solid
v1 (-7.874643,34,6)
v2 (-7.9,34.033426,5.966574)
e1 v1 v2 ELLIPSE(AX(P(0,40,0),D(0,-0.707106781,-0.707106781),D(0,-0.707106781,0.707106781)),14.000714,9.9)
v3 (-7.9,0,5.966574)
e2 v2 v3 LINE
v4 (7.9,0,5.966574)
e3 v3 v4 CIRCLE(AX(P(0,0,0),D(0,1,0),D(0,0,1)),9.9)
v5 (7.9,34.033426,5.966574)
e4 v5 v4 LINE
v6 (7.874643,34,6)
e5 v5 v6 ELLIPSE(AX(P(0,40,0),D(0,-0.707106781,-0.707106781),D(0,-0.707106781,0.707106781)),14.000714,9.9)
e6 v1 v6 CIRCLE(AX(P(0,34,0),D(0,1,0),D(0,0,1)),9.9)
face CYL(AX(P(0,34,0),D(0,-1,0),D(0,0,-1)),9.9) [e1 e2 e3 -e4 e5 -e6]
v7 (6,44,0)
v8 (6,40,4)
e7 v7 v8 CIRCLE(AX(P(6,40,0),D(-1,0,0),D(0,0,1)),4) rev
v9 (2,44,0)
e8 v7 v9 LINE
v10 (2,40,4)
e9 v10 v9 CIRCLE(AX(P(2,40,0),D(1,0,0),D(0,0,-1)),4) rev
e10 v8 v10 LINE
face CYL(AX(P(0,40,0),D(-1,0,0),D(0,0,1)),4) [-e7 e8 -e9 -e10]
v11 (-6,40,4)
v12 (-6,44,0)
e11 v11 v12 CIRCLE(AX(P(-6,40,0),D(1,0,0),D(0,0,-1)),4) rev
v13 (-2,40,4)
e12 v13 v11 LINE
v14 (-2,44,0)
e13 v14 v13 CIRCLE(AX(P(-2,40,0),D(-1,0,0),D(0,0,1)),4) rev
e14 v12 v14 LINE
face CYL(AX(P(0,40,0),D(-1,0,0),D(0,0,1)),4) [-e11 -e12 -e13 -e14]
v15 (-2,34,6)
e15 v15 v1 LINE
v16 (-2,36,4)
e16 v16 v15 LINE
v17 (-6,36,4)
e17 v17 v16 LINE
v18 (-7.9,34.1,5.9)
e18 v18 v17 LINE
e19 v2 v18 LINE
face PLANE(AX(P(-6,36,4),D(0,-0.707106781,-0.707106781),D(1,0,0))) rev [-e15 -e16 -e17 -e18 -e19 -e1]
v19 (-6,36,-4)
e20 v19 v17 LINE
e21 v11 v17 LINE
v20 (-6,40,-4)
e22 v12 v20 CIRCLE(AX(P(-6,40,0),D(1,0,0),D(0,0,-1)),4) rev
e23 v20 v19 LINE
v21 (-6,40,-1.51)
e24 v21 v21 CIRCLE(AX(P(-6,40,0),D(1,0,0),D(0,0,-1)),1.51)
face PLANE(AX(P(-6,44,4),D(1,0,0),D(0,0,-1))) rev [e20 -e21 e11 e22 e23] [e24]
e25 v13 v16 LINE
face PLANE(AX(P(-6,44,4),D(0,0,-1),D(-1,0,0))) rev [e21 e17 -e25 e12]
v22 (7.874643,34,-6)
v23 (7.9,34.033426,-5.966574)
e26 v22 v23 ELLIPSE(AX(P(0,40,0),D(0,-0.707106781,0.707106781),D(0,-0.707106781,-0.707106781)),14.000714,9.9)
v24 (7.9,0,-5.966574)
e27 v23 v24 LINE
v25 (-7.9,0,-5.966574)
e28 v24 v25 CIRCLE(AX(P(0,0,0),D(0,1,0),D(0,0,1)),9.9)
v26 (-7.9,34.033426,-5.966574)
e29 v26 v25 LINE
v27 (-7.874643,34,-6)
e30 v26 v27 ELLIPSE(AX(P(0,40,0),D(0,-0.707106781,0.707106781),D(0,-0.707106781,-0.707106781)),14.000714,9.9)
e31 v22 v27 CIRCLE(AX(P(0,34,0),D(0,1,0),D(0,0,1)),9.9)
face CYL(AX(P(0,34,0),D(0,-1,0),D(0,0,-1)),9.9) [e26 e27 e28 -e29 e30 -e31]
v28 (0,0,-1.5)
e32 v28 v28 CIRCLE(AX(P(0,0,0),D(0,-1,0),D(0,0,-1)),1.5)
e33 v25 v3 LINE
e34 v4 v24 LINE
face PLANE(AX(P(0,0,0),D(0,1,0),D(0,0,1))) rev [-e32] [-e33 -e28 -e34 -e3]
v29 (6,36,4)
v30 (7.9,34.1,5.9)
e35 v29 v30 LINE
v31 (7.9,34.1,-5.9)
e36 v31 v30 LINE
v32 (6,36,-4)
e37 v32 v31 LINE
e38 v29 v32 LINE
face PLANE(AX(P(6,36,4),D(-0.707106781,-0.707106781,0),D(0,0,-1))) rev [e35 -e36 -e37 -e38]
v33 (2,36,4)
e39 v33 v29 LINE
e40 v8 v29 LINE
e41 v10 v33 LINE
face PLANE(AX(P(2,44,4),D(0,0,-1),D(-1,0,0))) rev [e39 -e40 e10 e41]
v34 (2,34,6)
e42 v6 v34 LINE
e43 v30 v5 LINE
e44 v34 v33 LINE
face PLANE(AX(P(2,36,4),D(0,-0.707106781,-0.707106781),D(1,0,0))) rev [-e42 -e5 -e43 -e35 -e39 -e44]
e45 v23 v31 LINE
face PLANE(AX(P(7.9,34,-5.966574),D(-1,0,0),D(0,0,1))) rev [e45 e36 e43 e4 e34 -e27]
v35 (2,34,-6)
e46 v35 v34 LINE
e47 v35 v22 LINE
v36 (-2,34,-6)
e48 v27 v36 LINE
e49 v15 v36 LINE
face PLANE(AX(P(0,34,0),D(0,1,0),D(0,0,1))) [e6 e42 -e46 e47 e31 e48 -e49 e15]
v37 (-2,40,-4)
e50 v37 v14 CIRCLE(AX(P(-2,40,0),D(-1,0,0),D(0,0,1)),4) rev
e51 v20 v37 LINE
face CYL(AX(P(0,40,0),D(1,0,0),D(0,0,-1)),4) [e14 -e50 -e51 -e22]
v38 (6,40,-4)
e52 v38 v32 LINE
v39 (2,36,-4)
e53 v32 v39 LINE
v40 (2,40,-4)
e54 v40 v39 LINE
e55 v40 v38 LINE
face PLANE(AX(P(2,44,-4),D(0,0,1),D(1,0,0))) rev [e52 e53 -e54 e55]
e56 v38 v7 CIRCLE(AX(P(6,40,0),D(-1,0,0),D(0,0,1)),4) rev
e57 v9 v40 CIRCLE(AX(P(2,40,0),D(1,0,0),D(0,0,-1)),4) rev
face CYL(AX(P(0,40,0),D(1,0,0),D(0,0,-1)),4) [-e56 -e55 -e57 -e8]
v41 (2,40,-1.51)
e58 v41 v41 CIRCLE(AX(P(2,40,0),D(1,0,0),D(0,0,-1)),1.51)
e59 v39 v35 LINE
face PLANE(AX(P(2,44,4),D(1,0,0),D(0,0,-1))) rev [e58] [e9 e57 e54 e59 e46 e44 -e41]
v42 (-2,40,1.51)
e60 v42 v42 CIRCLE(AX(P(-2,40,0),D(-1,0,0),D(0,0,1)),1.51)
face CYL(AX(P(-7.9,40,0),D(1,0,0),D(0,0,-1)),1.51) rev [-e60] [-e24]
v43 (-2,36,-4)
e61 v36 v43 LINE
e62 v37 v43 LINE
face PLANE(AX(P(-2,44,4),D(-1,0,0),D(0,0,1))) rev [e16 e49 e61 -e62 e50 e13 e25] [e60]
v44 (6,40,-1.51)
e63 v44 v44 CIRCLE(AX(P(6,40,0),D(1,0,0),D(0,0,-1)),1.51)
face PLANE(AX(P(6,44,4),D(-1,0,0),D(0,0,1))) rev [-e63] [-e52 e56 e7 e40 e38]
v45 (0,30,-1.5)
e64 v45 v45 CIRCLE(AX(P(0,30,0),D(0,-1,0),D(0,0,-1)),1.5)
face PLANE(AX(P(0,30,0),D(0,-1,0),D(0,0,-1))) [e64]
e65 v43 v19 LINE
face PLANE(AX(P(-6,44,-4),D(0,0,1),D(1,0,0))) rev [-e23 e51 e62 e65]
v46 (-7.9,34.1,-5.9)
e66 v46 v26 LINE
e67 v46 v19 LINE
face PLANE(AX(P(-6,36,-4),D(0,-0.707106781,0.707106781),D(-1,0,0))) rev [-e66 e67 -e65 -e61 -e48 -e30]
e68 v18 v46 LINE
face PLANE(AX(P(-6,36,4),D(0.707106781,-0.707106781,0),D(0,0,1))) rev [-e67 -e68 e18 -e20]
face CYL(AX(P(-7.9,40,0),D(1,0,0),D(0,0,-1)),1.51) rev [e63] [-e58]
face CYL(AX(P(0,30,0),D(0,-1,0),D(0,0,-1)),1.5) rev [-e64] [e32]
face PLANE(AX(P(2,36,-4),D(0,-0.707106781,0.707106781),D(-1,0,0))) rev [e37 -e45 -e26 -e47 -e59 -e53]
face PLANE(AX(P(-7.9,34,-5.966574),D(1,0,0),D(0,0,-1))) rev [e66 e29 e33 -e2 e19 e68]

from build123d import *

# Parameters (mm, degrees)
BOSS_EXTRUDE1_DEPTH = 34
SKETCH7_W           = 4
SKETCH7_H           = 8
BOSS_EXTRUDE3_DEPTH = 10
SKETCH9_R           = 1.51
CUT_EXTRUDE5_DEPTH  = 48.193431746
FILLET2_R           = 4
SKETCH16_R          = 1.5
CUT_EXTRUDE7_DEPTH  = 30
CHAMFER1_SIZE       = 2


# Some blends are built 0.0001 mm under size
with BuildPart() as part:
    # Sketch1 → Boss-Extrude1 (new body)
    with BuildSketch(Plane(origin=(0, 0, 0), x_dir=(1, 0, 0), z_dir=(0, 1, 0))):
        with BuildLine():
            Line((-7.9, 5.966573556), (-7.9, -5.966573556))
            ThreePointArc((-7.9, -5.966573556), (0, -9.9), (7.9, -5.966573556))
            Line((7.9, -5.966573556), (7.9, 5.966573556))
            ThreePointArc((7.9, 5.966573556), (0, 9.9), (-7.9, 5.966573556))
        make_face()
    extrude(amount=BOSS_EXTRUDE1_DEPTH)

    # Sketch7 → Boss-Extrude3 (add)
    with BuildSketch(Plane(origin=(0, 34, 0), x_dir=(1, 0, 0), z_dir=(0, 1, 0))):
        with Locations((-4, 0)):
            Rectangle(SKETCH7_W, SKETCH7_H)
        with Locations((4, 0)):
            Rectangle(SKETCH7_W, SKETCH7_H)
    extrude(amount=BOSS_EXTRUDE3_DEPTH)

    # Sketch9 → Cut-Extrude5 (cut, through all)
    with BuildSketch(Plane(origin=(6, 0, 0), x_dir=(0, 0, -1), z_dir=(1, 0, 0))):
        with Locations((0, 40)):
            Circle(SKETCH9_R)
    extrude(amount=-CUT_EXTRUDE5_DEPTH, mode=Mode.SUBTRACT)

    # Fillet2
    fillet2_edges = [part.edges().sort_by_distance(p)[0] for p in [
        (4, 44, 4),
        (4, 44, -4),
        (-4, 44, -4),
        (-4, 44, 4),
    ]]
    fillet(fillet2_edges, radius=FILLET2_R - 0.0001)  # a hair under: the kernel refuses the full size

    # Sketch16 → Cut-Extrude7 (cut)
    with BuildSketch(Plane.XZ):
        with Locations(Location((0, 0, 0), (0, 0, 270))):
            Circle(SKETCH16_R)
    extrude(amount=-CUT_EXTRUDE7_DEPTH, mode=Mode.SUBTRACT)

    # Chamfer1
    # the kernel refuses this chamfer: 2 mm, written as the material it adds along each edge
    with BuildSketch(Plane(origin=(-6, 34, -4), x_dir=(0, -0.027495876610585623, -0.9996219169112968), z_dir=(1, 0, 0)), Plane(origin=(2, 34, -4), x_dir=(0, -0.027495876610585623, -0.9996219169112968), z_dir=(1, 0, 0)), Plane(origin=(6, 34, 4), x_dir=(0, -0.027495876610585623, 0.9996219169112968), z_dir=(-1, 0, 0))) as chamfer1_piece_1:
        Polygon((CHAMFER1_SIZE * 0.999621916911, CHAMFER1_SIZE * 0.0274958766106), (-CHAMFER1_SIZE * 0.0274958766106, CHAMFER1_SIZE * 0.999621916911), (0, 0), align=None)
    extrude(amount=4)
    with BuildSketch(Plane(origin=(-6, 34, -4), x_dir=(0, -0.027495876610585623, -0.9996219169112968), z_dir=(1, 0, 0))) as chamfer1_piece_2_section:
        Polygon((CHAMFER1_SIZE * 0.999621916911, CHAMFER1_SIZE * 0.0274958766106), (-CHAMFER1_SIZE * 0.0274958766106, CHAMFER1_SIZE * 0.999621916911), (0, 0), align=None)
    chamfer1_piece_2 = extrude(amount=9.143365976, mode=Mode.PRIVATE)
    chamfer1_piece_2 = split(chamfer1_piece_2, bisect_by=Plane(origin=(2, 34.659587254, -4.659587254), z_dir=(1, 0, 0)), keep=Keep.TOP, mode=Mode.PRIVATE)
    add(chamfer1_piece_2)
    with BuildSketch(Plane(origin=(-6, 34, 4), x_dir=(0.02749587661058651, 0.9996219169112968, 0), z_dir=(0, 0, -1))) as chamfer1_piece_3_section:
        Polygon((CHAMFER1_SIZE * 0.999621916911, -CHAMFER1_SIZE * 0.0274958766106), (-CHAMFER1_SIZE * 0.0274958766106, -CHAMFER1_SIZE * 0.999621916911), (0, 0), align=None)
    chamfer1_piece_3 = extrude(amount=8, mode=Mode.PRIVATE)
    chamfer1_piece_3 = split(chamfer1_piece_3, bisect_by=Plane(origin=(-7.9, 34.66508919, 0), z_dir=(1, 0, 0)), keep=Keep.TOP, mode=Mode.PRIVATE)
    add(chamfer1_piece_3)
    with BuildSketch(Plane(origin=(3.143365976, 34, 4), x_dir=(0, 0.9996219169112968, -0.027495876610586296), z_dir=(-1, 0, 0))) as chamfer1_piece_4_section:
        Polygon((CHAMFER1_SIZE * 0.999621916911, -CHAMFER1_SIZE * 0.0274958766106), (-CHAMFER1_SIZE * 0.0274958766106, -CHAMFER1_SIZE * 0.999621916911), (0, 0), align=None)
    chamfer1_piece_4 = extrude(amount=9.143365976, mode=Mode.PRIVATE)
    chamfer1_piece_4 = split(chamfer1_piece_4, bisect_by=Plane(origin=(2, 34.659587254, 4.659587254), z_dir=(1, 0, 0)), keep=Keep.TOP, mode=Mode.PRIVATE)
    add(chamfer1_piece_4)
    with BuildSketch(Plane(origin=(-2, 34, 4), x_dir=(0, 0.9996219169112968, -0.027495876610586296), z_dir=(-1, 0, 0))) as chamfer1_piece_5:
        Polygon((CHAMFER1_SIZE * 0.999621916911, -CHAMFER1_SIZE * 0.0274958766106), (-CHAMFER1_SIZE * 0.0274958766106, -CHAMFER1_SIZE * 0.999621916911), (0, 0), align=None)
    extrude(amount=4)
    with BuildSketch(Plane(origin=(-3.143365976, 34, -4), x_dir=(0, -0.027495876610585623, -0.9996219169112968), z_dir=(1, 0, 0))) as chamfer1_piece_6_section:
        Polygon((CHAMFER1_SIZE * 0.999621916911, CHAMFER1_SIZE * 0.0274958766106), (-CHAMFER1_SIZE * 0.0274958766106, CHAMFER1_SIZE * 0.999621916911), (0, 0), align=None)
    chamfer1_piece_6 = extrude(amount=9.143365976, mode=Mode.PRIVATE)
    chamfer1_piece_6 = split(chamfer1_piece_6, bisect_by=Plane(origin=(-2, 34.659587254, -4.659587254), z_dir=(-1, 0, 0)), keep=Keep.TOP, mode=Mode.PRIVATE)
    add(chamfer1_piece_6)
    with BuildSketch(Plane(origin=(6, 34, 4), x_dir=(0, -0.027495876610585623, 0.9996219169112968), z_dir=(-1, 0, 0))) as chamfer1_piece_7_section:
        Polygon((CHAMFER1_SIZE * 0.999621916911, CHAMFER1_SIZE * 0.0274958766106), (-CHAMFER1_SIZE * 0.0274958766106, CHAMFER1_SIZE * 0.999621916911), (0, 0), align=None)
    chamfer1_piece_7 = extrude(amount=9.143365976, mode=Mode.PRIVATE)
    chamfer1_piece_7 = split(chamfer1_piece_7, bisect_by=Plane(origin=(-2, 34.659587254, 4.659587254), z_dir=(-1, 0, 0)), keep=Keep.TOP, mode=Mode.PRIVATE)
    add(chamfer1_piece_7)
    with BuildSketch(Plane(origin=(6, 34, -4), x_dir=(0.9996219169112968, -0.027495876610585623, 0), z_dir=(0, 0, 1))) as chamfer1_piece_8_section:
        Polygon((CHAMFER1_SIZE * 0.999621916911, CHAMFER1_SIZE * 0.0274958766106), (-CHAMFER1_SIZE * 0.0274958766106, CHAMFER1_SIZE * 0.999621916911), (0, 0), align=None)
    chamfer1_piece_8 = extrude(amount=8, mode=Mode.PRIVATE)
    chamfer1_piece_8 = split(chamfer1_piece_8, bisect_by=Plane(origin=(7.9, 34.66508919, 0), z_dir=(-1, 0, 0)), keep=Keep.TOP, mode=Mode.PRIVATE)
    add(chamfer1_piece_8)
    with BuildSketch(Plane(origin=(-6, 34, 4), x_dir=(0.02749587661058651, 0.9996219169112968, 0), z_dir=(0, 0, -1))) as chamfer1_piece_9a_section:
        Polygon((CHAMFER1_SIZE * 0.999621916911, -CHAMFER1_SIZE * 0.0274958766106), (-CHAMFER1_SIZE * 0.0274958766106, -CHAMFER1_SIZE * 0.999621916911), (0, 0), align=None)
    chamfer1_piece_9a = extrude(amount=13.143365976, mode=Mode.PRIVATE)
    chamfer1_piece_9a = split(chamfer1_piece_9a, bisect_by=Plane(origin=(-6.579477658, 34.702229701, -4), z_dir=(0, 0, -1)), keep=Keep.TOP, mode=Mode.PRIVATE)
    chamfer1_piece_9a = chamfer1_piece_9a & Plane(origin=(0, 34.702229701, 0), x_dir=(-0.7979797979797981, 0, 0.6026841975828805), z_dir=(0, -1, 0)) * Cylinder(9.9, 35, mode=Mode.PRIVATE)
    chamfer1_piece_9a = split(chamfer1_piece_9a, bisect_by=Plane(origin=(-7.9, 34.702229701, -5.684853753), z_dir=(1, 0, 0)), keep=Keep.TOP, mode=Mode.PRIVATE)
    with BuildSketch(Plane(origin=(-11.143365976, 34, -4), x_dir=(0, -0.027495876610585623, -0.9996219169112968), z_dir=(1, 0, 0))) as chamfer1_piece_9b_section:
        Polygon((CHAMFER1_SIZE * 0.999621916911, CHAMFER1_SIZE * 0.0274958766106), (-CHAMFER1_SIZE * 0.0274958766106, CHAMFER1_SIZE * 0.999621916911), (0, 0), align=None)
    chamfer1_piece_9b = extrude(amount=9.143365976, mode=Mode.PRIVATE)
    chamfer1_piece_9b = split(chamfer1_piece_9b, bisect_by=Plane(origin=(-6, 34.659622918, -4.659519528), z_dir=(-1, 0, 0)), keep=Keep.TOP, mode=Mode.PRIVATE)
    chamfer1_piece_9b = split(chamfer1_piece_9b, bisect_by=Plane(origin=(-7.9, 34.659622918, -4.659519528), z_dir=(1, 0, 0)), keep=Keep.TOP, mode=Mode.PRIVATE)
    chamfer1_piece_9b = chamfer1_piece_9b & Plane(origin=(0, 34.659622918, 0), x_dir=(0.7979797979797981, 0, -0.6026841975828805), z_dir=(0, -1, 0)) * Cylinder(9.9, 27, mode=Mode.PRIVATE)
    chamfer1_piece_9 = chamfer1_piece_9a & chamfer1_piece_9b
    add(chamfer1_piece_9)
    with BuildSketch(Plane(origin=(-6, 34, 9.143365976), x_dir=(0.02749587661058651, 0.9996219169112968, 0), z_dir=(0, 0, -1))) as chamfer1_piece_10a_section:
        Polygon((CHAMFER1_SIZE * 0.999621916911, -CHAMFER1_SIZE * 0.0274958766106), (-CHAMFER1_SIZE * 0.0274958766106, -CHAMFER1_SIZE * 0.999621916911), (0, 0), align=None)
    chamfer1_piece_10a = extrude(amount=13.143365976, mode=Mode.PRIVATE)
    chamfer1_piece_10a = split(chamfer1_piece_10a, bisect_by=Plane(origin=(-6.579477657, 34.702229707, 4), z_dir=(0, 0, 1)), keep=Keep.TOP, mode=Mode.PRIVATE)
    chamfer1_piece_10a = chamfer1_piece_10a & Plane(origin=(0, 34.702229707, 0), x_dir=(-0.7979797979797981, 0, 0.6026841975828805), z_dir=(0, -1, 0)) * Cylinder(9.9, 35, mode=Mode.PRIVATE)
    chamfer1_piece_10a = split(chamfer1_piece_10a, bisect_by=Plane(origin=(-7.9, 34.702229707, 5.684853748), z_dir=(1, 0, 0)), keep=Keep.TOP, mode=Mode.PRIVATE)
    with BuildSketch(Plane(origin=(-2, 34, 4), x_dir=(0, 0.9996219169112968, -0.027495876610586296), z_dir=(-1, 0, 0))) as chamfer1_piece_10b_section:
        Polygon((CHAMFER1_SIZE * 0.999621916911, -CHAMFER1_SIZE * 0.0274958766106), (-CHAMFER1_SIZE * 0.0274958766106, -CHAMFER1_SIZE * 0.999621916911), (0, 0), align=None)
    chamfer1_piece_10b = extrude(amount=9.143365976, mode=Mode.PRIVATE)
    chamfer1_piece_10b = split(chamfer1_piece_10b, bisect_by=Plane(origin=(-6, 34.659622918, 4.659519528), z_dir=(-1, 0, 0)), keep=Keep.TOP, mode=Mode.PRIVATE)
    chamfer1_piece_10b = chamfer1_piece_10b & Plane(origin=(0, 34.659622918, 0), x_dir=(-0.7979797979797981, 0, 0.6026841975828805), z_dir=(0, -1, 0)) * Cylinder(9.9, 27, mode=Mode.PRIVATE)
    chamfer1_piece_10b = split(chamfer1_piece_10b, bisect_by=Plane(origin=(-7.9, 34.659622918, 4.659519528), z_dir=(1, 0, 0)), keep=Keep.TOP, mode=Mode.PRIVATE)
    chamfer1_piece_10 = chamfer1_piece_10a & chamfer1_piece_10b
    add(chamfer1_piece_10)
    with BuildSketch(Plane(origin=(6, 34, -9.143365976), x_dir=(0.9996219169112968, -0.027495876610585623, 0), z_dir=(0, 0, 1))) as chamfer1_piece_11a_section:
        Polygon((CHAMFER1_SIZE * 0.999621916911, CHAMFER1_SIZE * 0.0274958766106), (-CHAMFER1_SIZE * 0.0274958766106, CHAMFER1_SIZE * 0.999621916911), (0, 0), align=None)
    chamfer1_piece_11a = extrude(amount=13.143365976, mode=Mode.PRIVATE)
    chamfer1_piece_11a = chamfer1_piece_11a & Plane(origin=(0, 34.702229706, 0), x_dir=(-0.7979797979797981, 0, 0.6026841975828805), z_dir=(0, -1, 0)) * Cylinder(9.9, 35, mode=Mode.PRIVATE)
    chamfer1_piece_11a = split(chamfer1_piece_11a, bisect_by=Plane(origin=(7.9, 34.702229706, -5.684853749), z_dir=(-1, 0, 0)), keep=Keep.TOP, mode=Mode.PRIVATE)
    chamfer1_piece_11a = split(chamfer1_piece_11a, bisect_by=Plane(origin=(6.579477658, 34.702229706, -4), z_dir=(0, 0, -1)), keep=Keep.TOP, mode=Mode.PRIVATE)
    with BuildSketch(Plane(origin=(2, 34, -4), x_dir=(0, -0.027495876610585623, -0.9996219169112968), z_dir=(1, 0, 0))) as chamfer1_piece_11b_section:
        Polygon((CHAMFER1_SIZE * 0.999621916911, CHAMFER1_SIZE * 0.0274958766106), (-CHAMFER1_SIZE * 0.0274958766106, CHAMFER1_SIZE * 0.999621916911), (0, 0), align=None)
    chamfer1_piece_11b = extrude(amount=9.143365976, mode=Mode.PRIVATE)
    chamfer1_piece_11b = split(chamfer1_piece_11b, bisect_by=Plane(origin=(7.9, 34.659622918, -4.659519528), z_dir=(-1, 0, 0)), keep=Keep.TOP, mode=Mode.PRIVATE)
    chamfer1_piece_11b = chamfer1_piece_11b & Plane(origin=(0, 34.659622918, 0), x_dir=(0.7979797979797981, 0, -0.6026841975828805), z_dir=(0, -1, 0)) * Cylinder(9.9, 27, mode=Mode.PRIVATE)
    chamfer1_piece_11b = split(chamfer1_piece_11b, bisect_by=Plane(origin=(6, 34.659622918, -4.659519528), z_dir=(1, 0, 0)), keep=Keep.TOP, mode=Mode.PRIVATE)
    chamfer1_piece_11 = chamfer1_piece_11a & chamfer1_piece_11b
    add(chamfer1_piece_11)
    with BuildSketch(Plane(origin=(11.143365976, 34, 4), x_dir=(0, -0.027495876610585623, 0.9996219169112968), z_dir=(-1, 0, 0))) as chamfer1_piece_12a_section:
        Polygon((CHAMFER1_SIZE * 0.999621916911, CHAMFER1_SIZE * 0.0274958766106), (-CHAMFER1_SIZE * 0.0274958766106, CHAMFER1_SIZE * 0.999621916911), (0, 0), align=None)
    chamfer1_piece_12a = extrude(amount=9.143365976, mode=Mode.PRIVATE)
    chamfer1_piece_12a = chamfer1_piece_12a & Plane(origin=(0, 34.659622918, 0), x_dir=(-0.7979797979797981, 0, 0.6026841975828805), z_dir=(0, -1, 0)) * Cylinder(9.9, 27, mode=Mode.PRIVATE)
    chamfer1_piece_12a = split(chamfer1_piece_12a, bisect_by=Plane(origin=(7.9, 34.659622918, 4.659519528), z_dir=(-1, 0, 0)), keep=Keep.TOP, mode=Mode.PRIVATE)
    chamfer1_piece_12a = split(chamfer1_piece_12a, bisect_by=Plane(origin=(6, 34.659622918, 4.659519528), z_dir=(1, 0, 0)), keep=Keep.TOP, mode=Mode.PRIVATE)
    with BuildSketch(Plane(origin=(6, 34, -4), x_dir=(0.9996219169112968, -0.027495876610585623, 0), z_dir=(0, 0, 1))) as chamfer1_piece_12b_section:
        Polygon((CHAMFER1_SIZE * 0.999621916911, CHAMFER1_SIZE * 0.0274958766106), (-CHAMFER1_SIZE * 0.0274958766106, CHAMFER1_SIZE * 0.999621916911), (0, 0), align=None)
    chamfer1_piece_12b = extrude(amount=13.143365976, mode=Mode.PRIVATE)
    chamfer1_piece_12b = chamfer1_piece_12b & Plane(origin=(0, 34.702229701, 0), x_dir=(-0.7979797979797981, 0, 0.6026841975828805), z_dir=(0, -1, 0)) * Cylinder(9.9, 35, mode=Mode.PRIVATE)
    chamfer1_piece_12b = split(chamfer1_piece_12b, bisect_by=Plane(origin=(7.9, 34.702229701, 5.684853753), z_dir=(-1, 0, 0)), keep=Keep.TOP, mode=Mode.PRIVATE)
    chamfer1_piece_12b = split(chamfer1_piece_12b, bisect_by=Plane(origin=(6.579477658, 34.702229701, 4), z_dir=(0, 0, 1)), keep=Keep.TOP, mode=Mode.PRIVATE)
    chamfer1_piece_12 = chamfer1_piece_12a & chamfer1_piece_12b
    add(chamfer1_piece_12)


solid = part.part
